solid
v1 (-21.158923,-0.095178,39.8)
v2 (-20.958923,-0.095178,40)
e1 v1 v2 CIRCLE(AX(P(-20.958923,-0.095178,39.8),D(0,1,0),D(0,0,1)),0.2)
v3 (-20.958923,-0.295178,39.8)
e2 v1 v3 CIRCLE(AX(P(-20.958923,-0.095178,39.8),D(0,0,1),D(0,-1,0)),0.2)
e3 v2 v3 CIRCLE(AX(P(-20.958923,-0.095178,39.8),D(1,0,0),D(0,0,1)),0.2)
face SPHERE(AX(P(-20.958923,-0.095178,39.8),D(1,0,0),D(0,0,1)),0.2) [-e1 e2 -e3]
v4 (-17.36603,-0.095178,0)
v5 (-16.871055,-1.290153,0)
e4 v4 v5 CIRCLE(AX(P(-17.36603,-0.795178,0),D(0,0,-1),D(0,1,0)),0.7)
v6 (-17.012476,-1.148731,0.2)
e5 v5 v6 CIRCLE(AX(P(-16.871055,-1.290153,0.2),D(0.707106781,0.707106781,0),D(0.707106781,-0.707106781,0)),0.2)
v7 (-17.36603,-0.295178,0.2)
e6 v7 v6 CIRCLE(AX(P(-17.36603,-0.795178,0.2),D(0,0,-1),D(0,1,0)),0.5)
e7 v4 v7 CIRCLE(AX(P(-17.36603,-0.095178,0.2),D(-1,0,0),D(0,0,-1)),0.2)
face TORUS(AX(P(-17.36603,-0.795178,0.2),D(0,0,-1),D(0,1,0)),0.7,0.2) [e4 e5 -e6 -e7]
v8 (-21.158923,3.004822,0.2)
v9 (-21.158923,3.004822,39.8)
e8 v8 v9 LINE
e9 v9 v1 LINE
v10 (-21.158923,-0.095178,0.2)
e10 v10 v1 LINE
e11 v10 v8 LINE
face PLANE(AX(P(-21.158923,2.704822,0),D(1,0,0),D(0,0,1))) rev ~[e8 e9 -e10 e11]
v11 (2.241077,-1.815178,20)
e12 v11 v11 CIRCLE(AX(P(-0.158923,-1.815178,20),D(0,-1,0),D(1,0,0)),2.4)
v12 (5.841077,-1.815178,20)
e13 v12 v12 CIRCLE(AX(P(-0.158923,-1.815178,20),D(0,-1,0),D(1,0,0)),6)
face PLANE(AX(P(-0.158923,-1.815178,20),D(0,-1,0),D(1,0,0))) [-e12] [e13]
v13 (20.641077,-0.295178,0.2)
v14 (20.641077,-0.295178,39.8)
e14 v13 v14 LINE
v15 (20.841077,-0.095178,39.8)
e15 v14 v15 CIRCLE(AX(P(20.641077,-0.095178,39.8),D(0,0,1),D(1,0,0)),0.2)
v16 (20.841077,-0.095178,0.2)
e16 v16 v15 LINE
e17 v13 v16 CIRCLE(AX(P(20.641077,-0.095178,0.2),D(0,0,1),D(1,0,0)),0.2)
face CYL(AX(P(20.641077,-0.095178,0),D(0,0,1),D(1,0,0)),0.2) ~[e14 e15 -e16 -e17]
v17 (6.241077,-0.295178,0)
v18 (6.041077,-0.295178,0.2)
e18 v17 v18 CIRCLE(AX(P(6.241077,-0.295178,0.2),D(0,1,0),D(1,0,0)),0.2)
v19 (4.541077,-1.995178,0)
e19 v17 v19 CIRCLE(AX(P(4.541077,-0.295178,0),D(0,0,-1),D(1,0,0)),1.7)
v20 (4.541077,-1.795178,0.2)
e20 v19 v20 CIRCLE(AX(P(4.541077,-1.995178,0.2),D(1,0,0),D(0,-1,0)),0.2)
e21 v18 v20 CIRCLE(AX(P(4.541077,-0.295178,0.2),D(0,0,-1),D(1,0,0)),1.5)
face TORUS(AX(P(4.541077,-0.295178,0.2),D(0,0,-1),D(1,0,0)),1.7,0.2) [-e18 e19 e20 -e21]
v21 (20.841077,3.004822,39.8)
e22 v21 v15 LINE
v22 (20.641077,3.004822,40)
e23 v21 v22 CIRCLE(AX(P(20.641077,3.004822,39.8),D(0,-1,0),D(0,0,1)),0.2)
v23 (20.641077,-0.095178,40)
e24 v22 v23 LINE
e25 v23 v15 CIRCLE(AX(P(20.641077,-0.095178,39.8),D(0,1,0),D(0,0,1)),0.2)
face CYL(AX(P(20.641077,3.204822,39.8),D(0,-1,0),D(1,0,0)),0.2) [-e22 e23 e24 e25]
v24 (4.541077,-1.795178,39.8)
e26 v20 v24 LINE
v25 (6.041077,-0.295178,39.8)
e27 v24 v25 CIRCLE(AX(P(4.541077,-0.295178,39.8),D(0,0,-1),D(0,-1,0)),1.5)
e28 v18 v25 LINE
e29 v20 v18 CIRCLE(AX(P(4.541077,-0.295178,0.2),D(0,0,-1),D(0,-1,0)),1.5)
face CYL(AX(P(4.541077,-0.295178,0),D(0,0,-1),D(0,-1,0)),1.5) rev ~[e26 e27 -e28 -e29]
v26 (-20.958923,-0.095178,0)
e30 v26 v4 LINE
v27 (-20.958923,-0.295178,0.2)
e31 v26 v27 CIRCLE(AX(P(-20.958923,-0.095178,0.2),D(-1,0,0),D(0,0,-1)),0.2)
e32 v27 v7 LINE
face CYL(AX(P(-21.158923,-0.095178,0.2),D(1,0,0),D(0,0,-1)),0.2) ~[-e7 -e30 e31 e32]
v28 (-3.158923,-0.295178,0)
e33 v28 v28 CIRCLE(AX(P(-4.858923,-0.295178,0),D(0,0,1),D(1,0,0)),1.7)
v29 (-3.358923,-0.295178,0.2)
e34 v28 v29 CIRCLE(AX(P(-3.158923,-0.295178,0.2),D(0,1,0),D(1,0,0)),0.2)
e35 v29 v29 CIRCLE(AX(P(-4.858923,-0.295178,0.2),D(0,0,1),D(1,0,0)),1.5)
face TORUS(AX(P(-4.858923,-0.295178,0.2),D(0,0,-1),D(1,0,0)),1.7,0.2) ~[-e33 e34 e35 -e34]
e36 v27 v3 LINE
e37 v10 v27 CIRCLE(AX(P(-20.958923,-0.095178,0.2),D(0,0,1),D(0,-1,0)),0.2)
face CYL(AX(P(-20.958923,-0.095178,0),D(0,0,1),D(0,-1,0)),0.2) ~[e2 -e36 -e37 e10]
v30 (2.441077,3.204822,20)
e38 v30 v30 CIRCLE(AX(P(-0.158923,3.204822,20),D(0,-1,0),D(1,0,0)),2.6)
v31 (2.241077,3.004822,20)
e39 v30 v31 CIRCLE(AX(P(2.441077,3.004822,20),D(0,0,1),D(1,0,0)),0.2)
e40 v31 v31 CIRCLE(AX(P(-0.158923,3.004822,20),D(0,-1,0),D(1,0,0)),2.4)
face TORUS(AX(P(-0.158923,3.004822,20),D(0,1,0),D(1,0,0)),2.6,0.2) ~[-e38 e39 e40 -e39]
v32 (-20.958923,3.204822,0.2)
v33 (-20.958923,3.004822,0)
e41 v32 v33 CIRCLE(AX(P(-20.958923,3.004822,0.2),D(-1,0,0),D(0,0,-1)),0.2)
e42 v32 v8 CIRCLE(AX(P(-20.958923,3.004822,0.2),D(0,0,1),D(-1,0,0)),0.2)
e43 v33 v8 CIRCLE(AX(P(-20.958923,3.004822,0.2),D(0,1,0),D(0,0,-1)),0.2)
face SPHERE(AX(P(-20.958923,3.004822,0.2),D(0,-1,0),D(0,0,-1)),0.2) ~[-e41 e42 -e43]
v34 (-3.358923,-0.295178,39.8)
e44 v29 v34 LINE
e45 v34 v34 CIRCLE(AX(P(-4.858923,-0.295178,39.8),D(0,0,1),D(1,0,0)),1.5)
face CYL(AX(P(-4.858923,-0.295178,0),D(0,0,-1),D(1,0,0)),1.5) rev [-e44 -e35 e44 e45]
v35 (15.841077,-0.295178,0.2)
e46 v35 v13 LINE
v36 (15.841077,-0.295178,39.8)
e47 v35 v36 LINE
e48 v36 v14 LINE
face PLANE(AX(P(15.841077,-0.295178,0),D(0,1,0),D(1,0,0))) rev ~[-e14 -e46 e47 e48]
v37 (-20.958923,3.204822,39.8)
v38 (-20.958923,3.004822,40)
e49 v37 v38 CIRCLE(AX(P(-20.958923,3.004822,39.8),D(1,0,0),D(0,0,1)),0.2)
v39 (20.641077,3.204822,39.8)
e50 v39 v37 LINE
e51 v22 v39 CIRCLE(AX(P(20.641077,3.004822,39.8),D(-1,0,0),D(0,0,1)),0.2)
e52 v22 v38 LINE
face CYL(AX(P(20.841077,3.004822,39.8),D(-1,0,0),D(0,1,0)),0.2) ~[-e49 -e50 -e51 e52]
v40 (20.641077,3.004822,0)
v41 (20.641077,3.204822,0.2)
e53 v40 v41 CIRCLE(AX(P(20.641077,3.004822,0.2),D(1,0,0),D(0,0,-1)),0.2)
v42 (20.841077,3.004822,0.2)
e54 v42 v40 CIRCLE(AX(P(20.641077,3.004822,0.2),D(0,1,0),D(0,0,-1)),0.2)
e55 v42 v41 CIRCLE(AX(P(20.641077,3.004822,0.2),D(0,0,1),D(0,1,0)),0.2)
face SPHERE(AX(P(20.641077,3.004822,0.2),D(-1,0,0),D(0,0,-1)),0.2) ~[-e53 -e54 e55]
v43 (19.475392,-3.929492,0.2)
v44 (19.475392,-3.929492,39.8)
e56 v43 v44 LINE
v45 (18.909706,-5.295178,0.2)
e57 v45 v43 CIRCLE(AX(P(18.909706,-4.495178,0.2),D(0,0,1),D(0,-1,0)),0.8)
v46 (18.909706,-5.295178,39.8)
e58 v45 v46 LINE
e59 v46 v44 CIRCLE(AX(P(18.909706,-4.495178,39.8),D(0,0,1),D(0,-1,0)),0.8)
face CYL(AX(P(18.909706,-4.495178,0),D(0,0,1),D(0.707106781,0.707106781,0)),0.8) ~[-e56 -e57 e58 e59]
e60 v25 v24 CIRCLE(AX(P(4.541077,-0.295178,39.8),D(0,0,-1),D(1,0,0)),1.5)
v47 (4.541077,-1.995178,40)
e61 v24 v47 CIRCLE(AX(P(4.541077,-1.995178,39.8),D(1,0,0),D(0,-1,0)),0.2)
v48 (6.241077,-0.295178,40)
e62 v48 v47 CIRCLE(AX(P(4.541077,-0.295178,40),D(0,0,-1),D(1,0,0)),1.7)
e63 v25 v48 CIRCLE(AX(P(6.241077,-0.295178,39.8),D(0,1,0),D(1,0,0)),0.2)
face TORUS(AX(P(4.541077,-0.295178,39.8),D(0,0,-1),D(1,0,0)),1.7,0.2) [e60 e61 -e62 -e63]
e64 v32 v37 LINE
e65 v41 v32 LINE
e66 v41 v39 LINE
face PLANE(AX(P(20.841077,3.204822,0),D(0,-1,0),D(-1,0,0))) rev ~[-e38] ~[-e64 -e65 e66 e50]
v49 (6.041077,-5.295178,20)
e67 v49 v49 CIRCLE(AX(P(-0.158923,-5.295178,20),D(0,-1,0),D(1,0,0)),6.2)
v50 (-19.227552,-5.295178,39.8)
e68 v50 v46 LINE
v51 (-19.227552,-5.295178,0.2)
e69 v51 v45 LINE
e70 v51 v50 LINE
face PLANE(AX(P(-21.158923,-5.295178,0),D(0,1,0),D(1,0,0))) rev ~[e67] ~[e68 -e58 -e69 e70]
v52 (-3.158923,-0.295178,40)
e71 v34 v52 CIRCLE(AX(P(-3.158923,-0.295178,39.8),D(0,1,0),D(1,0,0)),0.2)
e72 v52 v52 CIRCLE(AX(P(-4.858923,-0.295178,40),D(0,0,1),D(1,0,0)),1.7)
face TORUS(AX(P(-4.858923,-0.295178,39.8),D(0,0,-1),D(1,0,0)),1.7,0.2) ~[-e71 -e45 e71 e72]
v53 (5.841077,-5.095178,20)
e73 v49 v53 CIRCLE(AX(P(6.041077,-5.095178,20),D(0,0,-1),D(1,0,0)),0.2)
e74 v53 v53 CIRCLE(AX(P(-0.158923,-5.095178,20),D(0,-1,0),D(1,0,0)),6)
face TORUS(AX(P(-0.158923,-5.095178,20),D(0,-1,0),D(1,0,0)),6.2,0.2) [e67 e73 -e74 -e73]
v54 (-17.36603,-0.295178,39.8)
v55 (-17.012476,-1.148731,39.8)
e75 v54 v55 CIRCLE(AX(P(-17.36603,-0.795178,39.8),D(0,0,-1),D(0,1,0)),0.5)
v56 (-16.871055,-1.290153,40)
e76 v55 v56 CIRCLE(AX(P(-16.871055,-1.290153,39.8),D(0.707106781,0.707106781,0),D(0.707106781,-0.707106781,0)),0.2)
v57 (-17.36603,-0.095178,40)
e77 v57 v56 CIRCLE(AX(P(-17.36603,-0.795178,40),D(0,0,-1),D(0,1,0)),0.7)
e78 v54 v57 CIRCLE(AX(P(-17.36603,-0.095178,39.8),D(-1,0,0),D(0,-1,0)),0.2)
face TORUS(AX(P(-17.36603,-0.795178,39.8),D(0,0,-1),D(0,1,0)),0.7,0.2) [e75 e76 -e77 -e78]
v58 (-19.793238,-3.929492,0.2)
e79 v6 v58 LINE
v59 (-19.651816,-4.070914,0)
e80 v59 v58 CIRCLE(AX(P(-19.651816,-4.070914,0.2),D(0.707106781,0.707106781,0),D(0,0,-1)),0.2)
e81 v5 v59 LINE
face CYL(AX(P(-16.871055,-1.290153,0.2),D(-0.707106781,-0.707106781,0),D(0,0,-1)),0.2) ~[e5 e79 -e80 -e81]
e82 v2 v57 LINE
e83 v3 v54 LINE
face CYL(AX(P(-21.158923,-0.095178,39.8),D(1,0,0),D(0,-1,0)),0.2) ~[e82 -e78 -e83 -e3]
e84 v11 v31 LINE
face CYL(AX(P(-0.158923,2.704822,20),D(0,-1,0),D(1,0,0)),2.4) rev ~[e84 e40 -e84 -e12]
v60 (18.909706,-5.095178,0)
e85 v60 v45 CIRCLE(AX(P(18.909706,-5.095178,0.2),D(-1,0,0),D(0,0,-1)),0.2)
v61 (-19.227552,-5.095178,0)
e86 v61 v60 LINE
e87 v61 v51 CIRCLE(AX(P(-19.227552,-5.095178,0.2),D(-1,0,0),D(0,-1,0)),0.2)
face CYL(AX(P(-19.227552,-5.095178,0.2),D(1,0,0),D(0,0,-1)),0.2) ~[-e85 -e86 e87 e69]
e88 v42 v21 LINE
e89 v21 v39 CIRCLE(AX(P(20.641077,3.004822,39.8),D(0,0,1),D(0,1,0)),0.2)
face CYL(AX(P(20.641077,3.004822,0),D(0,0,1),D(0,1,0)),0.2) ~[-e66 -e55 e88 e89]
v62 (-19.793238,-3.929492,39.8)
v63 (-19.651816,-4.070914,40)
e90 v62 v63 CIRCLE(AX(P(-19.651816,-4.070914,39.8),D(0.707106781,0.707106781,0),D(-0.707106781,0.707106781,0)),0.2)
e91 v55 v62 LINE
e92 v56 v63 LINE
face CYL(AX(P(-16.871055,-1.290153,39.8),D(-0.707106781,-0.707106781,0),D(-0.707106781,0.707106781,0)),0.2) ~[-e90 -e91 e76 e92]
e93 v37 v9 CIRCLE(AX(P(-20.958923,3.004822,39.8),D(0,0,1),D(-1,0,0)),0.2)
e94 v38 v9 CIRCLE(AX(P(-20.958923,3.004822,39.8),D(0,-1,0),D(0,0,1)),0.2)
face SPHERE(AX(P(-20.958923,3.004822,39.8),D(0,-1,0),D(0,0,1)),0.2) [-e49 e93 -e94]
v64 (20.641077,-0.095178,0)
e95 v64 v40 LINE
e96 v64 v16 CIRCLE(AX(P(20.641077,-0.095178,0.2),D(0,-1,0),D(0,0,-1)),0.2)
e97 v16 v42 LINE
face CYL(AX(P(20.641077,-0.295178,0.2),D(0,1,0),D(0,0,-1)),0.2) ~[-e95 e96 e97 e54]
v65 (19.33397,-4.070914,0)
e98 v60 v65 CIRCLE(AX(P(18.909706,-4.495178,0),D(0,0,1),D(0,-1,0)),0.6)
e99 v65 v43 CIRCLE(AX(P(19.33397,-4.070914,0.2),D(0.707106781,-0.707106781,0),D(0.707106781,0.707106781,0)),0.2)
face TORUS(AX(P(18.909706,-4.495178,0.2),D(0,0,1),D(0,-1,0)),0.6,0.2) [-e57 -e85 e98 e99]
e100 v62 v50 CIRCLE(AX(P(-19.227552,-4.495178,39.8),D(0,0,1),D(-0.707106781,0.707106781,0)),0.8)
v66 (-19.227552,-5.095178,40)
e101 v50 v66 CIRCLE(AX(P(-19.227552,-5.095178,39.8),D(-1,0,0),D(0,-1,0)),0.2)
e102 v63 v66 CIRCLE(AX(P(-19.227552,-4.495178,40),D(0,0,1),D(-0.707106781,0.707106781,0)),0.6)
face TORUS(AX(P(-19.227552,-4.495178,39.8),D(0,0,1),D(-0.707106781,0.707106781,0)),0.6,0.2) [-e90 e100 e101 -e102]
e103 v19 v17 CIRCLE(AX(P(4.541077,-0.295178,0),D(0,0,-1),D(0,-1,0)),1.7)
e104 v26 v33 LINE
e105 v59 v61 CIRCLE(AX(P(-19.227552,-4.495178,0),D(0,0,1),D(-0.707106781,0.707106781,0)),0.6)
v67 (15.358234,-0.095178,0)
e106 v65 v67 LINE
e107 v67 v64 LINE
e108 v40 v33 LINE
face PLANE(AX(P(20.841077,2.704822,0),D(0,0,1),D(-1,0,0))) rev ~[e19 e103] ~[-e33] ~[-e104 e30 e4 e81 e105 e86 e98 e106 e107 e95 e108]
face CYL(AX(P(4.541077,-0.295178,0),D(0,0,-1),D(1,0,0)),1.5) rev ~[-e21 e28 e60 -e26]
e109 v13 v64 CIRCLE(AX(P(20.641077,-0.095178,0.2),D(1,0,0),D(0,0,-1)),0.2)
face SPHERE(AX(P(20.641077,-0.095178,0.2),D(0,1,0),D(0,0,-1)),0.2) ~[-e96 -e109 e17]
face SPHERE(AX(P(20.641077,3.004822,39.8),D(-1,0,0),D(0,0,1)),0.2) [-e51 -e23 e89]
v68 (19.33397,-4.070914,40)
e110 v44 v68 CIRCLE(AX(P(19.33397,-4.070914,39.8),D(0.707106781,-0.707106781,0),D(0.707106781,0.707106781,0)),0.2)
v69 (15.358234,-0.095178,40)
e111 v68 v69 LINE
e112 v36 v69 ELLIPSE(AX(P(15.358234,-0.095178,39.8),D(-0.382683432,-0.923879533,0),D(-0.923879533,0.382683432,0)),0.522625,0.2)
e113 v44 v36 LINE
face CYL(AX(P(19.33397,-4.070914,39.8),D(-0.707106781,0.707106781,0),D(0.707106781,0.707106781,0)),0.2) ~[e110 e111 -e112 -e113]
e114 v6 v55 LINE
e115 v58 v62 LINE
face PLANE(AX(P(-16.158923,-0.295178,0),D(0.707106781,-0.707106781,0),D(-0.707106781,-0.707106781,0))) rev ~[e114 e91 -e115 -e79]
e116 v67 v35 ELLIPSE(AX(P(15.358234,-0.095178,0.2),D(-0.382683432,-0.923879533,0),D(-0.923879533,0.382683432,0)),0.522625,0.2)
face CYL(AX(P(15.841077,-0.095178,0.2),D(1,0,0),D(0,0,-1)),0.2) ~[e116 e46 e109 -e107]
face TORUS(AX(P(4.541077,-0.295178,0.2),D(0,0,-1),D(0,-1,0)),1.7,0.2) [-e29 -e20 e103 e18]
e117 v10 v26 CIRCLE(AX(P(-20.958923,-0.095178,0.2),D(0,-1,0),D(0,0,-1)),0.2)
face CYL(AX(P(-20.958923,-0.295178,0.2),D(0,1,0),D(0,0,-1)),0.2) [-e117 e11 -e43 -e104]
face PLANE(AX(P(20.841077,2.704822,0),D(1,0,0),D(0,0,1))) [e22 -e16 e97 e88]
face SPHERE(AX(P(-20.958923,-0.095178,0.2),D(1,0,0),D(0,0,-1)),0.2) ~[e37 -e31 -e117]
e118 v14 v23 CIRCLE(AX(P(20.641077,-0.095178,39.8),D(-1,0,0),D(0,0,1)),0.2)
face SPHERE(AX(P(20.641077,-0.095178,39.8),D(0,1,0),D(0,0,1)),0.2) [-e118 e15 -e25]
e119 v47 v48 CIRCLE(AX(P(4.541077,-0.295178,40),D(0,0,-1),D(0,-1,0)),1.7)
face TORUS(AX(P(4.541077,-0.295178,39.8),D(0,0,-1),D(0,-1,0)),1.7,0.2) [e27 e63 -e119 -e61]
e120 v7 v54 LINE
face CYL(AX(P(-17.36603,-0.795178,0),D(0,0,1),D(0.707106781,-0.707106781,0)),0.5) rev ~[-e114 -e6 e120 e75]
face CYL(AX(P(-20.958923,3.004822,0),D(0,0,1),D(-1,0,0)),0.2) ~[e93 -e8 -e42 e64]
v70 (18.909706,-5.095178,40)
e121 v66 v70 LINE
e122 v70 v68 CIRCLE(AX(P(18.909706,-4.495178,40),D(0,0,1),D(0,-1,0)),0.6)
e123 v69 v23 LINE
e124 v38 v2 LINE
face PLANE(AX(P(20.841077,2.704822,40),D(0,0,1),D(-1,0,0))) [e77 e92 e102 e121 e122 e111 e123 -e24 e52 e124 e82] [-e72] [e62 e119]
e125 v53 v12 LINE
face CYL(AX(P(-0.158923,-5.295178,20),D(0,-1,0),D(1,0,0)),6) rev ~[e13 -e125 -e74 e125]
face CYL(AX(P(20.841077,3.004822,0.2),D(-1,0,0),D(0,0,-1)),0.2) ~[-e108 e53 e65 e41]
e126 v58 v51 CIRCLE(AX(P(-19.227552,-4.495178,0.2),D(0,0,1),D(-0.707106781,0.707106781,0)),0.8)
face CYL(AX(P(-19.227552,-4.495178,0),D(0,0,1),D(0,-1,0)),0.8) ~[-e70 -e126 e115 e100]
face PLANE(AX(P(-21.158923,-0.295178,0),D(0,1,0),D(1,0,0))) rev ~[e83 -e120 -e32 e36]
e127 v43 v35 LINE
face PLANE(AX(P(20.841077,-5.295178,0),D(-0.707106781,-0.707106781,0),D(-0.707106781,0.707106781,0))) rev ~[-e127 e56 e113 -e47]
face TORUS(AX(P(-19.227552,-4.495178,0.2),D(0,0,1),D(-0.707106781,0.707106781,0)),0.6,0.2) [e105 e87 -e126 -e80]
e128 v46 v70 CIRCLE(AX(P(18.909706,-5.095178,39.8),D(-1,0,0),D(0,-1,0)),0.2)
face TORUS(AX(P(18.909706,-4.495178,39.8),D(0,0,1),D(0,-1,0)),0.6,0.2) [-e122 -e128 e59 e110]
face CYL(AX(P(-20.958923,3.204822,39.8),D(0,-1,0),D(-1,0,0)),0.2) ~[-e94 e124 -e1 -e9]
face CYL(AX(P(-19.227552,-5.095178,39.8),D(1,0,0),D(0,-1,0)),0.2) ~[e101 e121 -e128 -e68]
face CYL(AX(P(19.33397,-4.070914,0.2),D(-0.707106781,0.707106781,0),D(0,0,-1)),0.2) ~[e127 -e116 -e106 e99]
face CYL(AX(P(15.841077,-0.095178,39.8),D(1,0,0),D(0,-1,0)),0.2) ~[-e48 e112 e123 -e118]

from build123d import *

# Parameters (mm, degrees)
F0_R     = 1.5
F1_DEPTH = 40
F2_R     = 2.4
F3_DEPTH = 8.001
F2_R_2   = 6
F4_DEPTH = 3.48
F5_DEPTH = 0.5
F6_R     = 0.8
F7_R     = 0.5
F8_R     = 0.2


# Not quite as in the source:
# - a feature names something its author has since deleted; it is built from what else it names


with BuildPart() as f1:
    # F0 (on Top) → F1 (new body)
    with BuildSketch(Plane.XY):
        Polygon((-13.1589230299, 2.7048220783), (-21.1589230299, 2.7048220783), (-21.1589230299, -0.2951779217), (-16.1589230299, -0.2951779217), (-21.1589230299, -5.2951779217), (-0.1589230299, -5.2951779217), (20.8410769701, -5.2951779217), (15.8410769701, -0.2951779217), (20.8410769701, -0.2951779217), (20.8410769701, 2.7048220783), (12.8410769701, 2.7048220783), (-0.1589230299, 2.7048220783), align=None)
        with Locations((-4.8589230299, -0.2951779217)):
            Circle(F0_R, mode=Mode.SUBTRACT)
        with BuildLine():
            ThreePointArc((6.0410769701, -0.2951779217), (5.6017371419, -1.3558380934), (4.5410769701, -1.7951779217))
            ThreePointArc((4.5410769701, -1.7951779217), (3.4804167983, 0.7654822501), (6.0410769701, -0.2951779217))
        make_face(mode=Mode.SUBTRACT)
    extrude(amount=F1_DEPTH)

    # F2 (on face) → F3 (cut, through all)
    with BuildSketch(Plane.XZ.offset(5.2951779217)):
        with Locations((-0.1589225605, 19.999999553)):
            Circle(F2_R)
    extrude(amount=-F3_DEPTH, mode=Mode.SUBTRACT)

    # F2 (on face) → F4 (cut)
    with BuildSketch(Plane.XZ.offset(5.2951779217)):
        with Locations((-0.1589225605, 19.999999553)):
            Circle(F2_R_2)
        with Locations((-0.1589225605, 19.999999553)):
            Circle(F2_R, mode=Mode.SUBTRACT)
    extrude(amount=-F4_DEPTH, mode=Mode.SUBTRACT)

    # F5 (add): a face of the model
    f5_faces = [f1.faces().sort_by_distance(p)[0] for p in [
        (20.2610769701, 2.7048220783, 20),
    ]]
    extrude(f5_faces, amount=F5_DEPTH)

    # F6
    f6_edges = [f1.edges().sort_by_distance(p)[0] for p in [
        (20.841077, -5.295178, 20),
        (-21.158923, -5.295178, 20),
    ]]
    fillet(f6_edges, radius=F6_R)

    # F7
    f7_edges = [f1.edges().sort_by_distance(p)[0] for p in [
        (-16.158923, -0.295178, 20),
    ]]
    fillet(f7_edges, radius=F7_R)

    # F8
    f8_edges = [f1.edges().sort_by_distance(p)[0] for p in [
        (-18.402857, -2.539112, 40),
        (-16.90409, -0.603836, 40),
        (-19.966656, -4.801325, 40),
        (-19.262476, -0.295178, 40),
        (-0.158923, -5.295178, 40),
        (-21.158923, 1.454822, 40),
        (19.64881, -4.801325, 40),
        (-0.158923, 3.204822, 40),
        (17.658234, -2.112335, 40),
        (20.841077, 1.454822, 40),
        (18.341077, -0.295178, 40),
        (-6.358923, -0.295178, 40),
        (4.541077, 1.204822, 40),
        (-18.402857, -2.539112, 0),
        (-16.90409, -0.603836, 0),
        (-19.966656, -4.801325, 0),
        (-19.262476, -0.295178, 0),
        (-0.158923, -5.295178, 0),
        (-21.158923, 1.454822, 0),
        (19.64881, -4.801325, 0),
        (-0.158923, 3.204822, 0),
        (17.658234, -2.112335, 0),
        (20.841077, 1.454822, 0),
        (18.341077, -0.295178, 0),
        (-6.358923, -0.295178, 0),
        (4.541077, 1.204822, 0),
        (20.841077, 3.204822, 20),
        (-21.158923, 3.204822, 20),
        (-2.558923, 3.204822, 20),
        (-6.158923, -5.295178, 20),
        (-21.158923, -0.295178, 20),
        (20.841077, -0.295178, 20),
    ]]
    fillet(f8_edges, radius=F8_R)


solid = f1.part
